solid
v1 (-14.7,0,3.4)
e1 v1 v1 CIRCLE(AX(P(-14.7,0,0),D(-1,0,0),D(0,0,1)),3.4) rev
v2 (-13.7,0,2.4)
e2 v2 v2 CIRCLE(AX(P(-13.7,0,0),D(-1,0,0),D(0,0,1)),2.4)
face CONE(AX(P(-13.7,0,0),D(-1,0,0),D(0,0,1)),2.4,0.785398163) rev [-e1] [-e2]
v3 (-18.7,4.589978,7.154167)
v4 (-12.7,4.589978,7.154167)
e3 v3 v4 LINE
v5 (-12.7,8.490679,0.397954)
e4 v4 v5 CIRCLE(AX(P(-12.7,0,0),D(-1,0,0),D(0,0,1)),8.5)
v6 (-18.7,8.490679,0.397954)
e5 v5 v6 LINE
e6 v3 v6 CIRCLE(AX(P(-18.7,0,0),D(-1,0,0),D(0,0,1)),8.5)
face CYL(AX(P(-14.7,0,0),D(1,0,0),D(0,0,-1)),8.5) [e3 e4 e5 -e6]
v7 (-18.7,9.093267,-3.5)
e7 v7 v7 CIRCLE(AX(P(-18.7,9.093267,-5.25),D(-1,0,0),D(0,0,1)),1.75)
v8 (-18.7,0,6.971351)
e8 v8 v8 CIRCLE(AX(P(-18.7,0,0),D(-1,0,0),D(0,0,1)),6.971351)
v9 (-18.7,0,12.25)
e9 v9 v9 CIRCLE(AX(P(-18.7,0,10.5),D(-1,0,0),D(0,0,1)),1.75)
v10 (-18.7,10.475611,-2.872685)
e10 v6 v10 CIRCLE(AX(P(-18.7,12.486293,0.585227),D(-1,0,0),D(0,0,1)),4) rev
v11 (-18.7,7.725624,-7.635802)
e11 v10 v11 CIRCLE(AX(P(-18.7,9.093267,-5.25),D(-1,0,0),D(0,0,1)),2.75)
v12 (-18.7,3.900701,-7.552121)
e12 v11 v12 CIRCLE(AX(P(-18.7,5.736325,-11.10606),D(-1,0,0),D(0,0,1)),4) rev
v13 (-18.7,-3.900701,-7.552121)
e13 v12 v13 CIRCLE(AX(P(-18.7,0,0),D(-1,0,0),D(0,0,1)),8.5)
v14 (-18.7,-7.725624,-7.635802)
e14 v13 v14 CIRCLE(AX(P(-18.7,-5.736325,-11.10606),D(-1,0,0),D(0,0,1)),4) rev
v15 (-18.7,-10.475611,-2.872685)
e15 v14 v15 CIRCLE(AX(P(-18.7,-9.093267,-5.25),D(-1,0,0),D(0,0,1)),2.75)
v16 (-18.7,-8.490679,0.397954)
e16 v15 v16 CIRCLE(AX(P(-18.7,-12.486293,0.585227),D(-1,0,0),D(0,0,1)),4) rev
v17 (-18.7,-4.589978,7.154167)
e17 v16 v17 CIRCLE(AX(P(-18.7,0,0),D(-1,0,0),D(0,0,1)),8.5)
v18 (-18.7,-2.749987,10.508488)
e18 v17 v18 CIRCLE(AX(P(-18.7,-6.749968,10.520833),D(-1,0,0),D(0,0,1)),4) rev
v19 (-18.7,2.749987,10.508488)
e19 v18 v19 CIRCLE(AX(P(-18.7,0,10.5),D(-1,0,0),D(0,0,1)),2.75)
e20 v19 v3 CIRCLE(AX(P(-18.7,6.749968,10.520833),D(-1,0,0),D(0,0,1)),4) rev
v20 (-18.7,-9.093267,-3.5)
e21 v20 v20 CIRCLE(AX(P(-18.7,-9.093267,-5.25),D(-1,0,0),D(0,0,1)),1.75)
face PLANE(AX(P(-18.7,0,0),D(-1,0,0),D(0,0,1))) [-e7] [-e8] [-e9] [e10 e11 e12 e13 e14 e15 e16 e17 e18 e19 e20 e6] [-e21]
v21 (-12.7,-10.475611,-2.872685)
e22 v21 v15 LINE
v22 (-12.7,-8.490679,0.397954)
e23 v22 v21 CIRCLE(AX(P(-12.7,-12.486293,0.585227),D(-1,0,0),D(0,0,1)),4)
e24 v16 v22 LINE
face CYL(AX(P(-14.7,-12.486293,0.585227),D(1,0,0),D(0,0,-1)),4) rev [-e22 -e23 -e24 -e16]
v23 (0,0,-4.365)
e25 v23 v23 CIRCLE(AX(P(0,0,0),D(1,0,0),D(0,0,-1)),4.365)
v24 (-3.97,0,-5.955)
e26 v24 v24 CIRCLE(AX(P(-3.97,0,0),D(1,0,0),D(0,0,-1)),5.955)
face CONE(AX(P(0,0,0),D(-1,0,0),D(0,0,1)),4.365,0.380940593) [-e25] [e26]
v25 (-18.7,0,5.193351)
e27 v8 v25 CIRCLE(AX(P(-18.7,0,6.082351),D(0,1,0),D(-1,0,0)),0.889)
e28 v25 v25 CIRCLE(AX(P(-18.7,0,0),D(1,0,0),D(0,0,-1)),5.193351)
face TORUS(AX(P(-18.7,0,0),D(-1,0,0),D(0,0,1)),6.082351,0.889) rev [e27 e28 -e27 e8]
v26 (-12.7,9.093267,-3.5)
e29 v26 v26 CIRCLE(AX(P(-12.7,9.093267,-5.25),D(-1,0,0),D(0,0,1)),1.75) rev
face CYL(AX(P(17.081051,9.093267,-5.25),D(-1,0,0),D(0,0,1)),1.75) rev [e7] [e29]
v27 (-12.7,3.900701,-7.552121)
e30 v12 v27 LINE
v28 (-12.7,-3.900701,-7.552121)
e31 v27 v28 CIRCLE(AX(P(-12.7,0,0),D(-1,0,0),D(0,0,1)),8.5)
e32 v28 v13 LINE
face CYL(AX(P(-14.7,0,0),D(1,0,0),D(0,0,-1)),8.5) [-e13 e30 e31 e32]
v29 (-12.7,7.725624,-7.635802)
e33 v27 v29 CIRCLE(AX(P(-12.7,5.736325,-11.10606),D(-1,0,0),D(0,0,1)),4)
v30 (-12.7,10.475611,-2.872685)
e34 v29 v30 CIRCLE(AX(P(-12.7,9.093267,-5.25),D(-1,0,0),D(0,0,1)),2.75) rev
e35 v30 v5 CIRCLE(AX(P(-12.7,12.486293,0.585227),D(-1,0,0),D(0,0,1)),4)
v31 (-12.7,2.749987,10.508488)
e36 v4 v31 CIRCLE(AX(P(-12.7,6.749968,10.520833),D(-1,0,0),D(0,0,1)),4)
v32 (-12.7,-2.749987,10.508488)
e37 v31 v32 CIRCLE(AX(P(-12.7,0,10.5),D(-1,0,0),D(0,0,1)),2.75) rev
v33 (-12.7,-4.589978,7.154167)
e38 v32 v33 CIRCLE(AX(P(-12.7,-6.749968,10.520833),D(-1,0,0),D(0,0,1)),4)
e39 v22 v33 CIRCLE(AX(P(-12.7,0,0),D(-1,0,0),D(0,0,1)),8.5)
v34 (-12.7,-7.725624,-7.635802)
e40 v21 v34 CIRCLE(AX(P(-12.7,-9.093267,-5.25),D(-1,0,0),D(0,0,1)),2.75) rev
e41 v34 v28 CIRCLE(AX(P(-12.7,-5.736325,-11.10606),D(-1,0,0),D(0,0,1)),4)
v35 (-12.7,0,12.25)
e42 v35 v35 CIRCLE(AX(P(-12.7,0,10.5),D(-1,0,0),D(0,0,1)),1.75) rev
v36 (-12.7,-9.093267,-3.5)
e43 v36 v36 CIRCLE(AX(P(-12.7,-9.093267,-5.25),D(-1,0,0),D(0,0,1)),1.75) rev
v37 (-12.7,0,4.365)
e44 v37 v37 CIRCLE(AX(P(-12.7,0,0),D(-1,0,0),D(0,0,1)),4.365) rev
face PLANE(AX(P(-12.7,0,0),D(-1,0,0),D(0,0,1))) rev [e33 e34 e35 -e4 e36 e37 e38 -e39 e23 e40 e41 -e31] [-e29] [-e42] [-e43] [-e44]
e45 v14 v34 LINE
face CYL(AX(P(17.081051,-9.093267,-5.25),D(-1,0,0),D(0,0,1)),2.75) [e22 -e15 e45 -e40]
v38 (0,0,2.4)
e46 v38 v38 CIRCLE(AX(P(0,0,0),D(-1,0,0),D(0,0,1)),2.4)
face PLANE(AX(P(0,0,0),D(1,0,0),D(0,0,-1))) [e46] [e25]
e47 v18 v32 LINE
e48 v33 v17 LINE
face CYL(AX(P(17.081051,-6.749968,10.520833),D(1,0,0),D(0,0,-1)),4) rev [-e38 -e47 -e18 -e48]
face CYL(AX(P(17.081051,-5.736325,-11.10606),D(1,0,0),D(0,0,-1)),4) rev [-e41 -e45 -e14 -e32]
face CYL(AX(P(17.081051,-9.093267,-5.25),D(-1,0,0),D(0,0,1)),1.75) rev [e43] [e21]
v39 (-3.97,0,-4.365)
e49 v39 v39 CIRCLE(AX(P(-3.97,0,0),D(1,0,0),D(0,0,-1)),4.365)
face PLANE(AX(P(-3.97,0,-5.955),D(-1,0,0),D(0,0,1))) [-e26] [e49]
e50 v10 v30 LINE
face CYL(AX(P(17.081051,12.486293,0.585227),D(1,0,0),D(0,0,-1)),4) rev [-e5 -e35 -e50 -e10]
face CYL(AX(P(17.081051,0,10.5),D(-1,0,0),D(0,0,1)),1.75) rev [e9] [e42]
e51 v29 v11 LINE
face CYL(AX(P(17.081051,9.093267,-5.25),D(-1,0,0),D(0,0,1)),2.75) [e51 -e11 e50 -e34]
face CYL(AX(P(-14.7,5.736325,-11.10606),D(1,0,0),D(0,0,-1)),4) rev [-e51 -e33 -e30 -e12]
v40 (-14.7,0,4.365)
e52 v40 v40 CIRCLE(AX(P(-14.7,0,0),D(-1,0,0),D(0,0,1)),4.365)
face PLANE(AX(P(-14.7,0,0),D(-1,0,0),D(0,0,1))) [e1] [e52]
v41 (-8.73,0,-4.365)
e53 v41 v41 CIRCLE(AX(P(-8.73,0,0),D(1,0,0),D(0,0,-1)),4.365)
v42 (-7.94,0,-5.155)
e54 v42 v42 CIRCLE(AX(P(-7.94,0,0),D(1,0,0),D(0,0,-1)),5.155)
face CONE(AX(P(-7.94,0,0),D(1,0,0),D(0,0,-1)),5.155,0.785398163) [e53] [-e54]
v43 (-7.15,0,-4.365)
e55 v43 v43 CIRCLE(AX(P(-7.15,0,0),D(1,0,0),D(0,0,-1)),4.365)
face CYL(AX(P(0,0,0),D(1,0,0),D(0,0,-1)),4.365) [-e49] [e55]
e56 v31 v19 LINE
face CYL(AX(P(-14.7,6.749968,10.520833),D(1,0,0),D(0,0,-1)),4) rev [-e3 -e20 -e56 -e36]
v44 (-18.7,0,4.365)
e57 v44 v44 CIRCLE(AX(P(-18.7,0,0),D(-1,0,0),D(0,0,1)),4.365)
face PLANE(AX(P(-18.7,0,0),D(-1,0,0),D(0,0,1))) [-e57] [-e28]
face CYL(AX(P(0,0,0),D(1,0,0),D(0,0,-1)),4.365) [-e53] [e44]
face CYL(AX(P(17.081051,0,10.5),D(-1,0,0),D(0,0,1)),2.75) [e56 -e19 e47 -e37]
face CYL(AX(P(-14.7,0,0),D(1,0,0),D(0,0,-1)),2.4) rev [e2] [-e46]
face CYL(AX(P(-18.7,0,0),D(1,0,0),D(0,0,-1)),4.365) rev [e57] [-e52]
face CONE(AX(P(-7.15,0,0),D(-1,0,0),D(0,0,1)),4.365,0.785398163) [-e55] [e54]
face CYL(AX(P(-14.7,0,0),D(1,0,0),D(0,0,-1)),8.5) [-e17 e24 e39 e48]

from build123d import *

# Parameters (mm, degrees)
SKETCH4_R            = 8.5
SKETCH4_R_2          = 4.365
SKETCH4_R_3          = 3.8
SKETCH4_R_4          = 2.4
BOSS_EXTRUDE1_DEPTH  = 2
BOSS_EXTRUDE2_START  = 2
SKETCH4_3_R          = 8.5
SKETCH4_3_R_2        = 4.365
BOSS_EXTRUDE2_DEPTH  = 4
SKETCH4_4_R          = 2.4
CUT_EXTRUDE2_DEPTH   = 18.486852204
CUT_SWEEP1_PROFILE_R = 0.889
SKETCH14_R           = 2.75
SKETCH14_R_2         = 1.75
BOSS_EXTRUDE3_DEPTH  = 6
FILLET3_R            = 4
CHAMFER1_SIZE        = 1


with BuildPart() as part:
    # Sketch1 → Revolve1 (revolve)
    with BuildSketch(Plane(origin=(0, 0, 0), x_dir=(1, 0, 0), z_dir=(0, 1, 0))):
        Polygon((0, 0), (-12.7, 0), (-12.7, 4.365), (-8.73, 4.365), (-7.94, 5.155), (-7.15, 4.365), (-3.97, 4.365), (-3.97, 5.955), (0, 4.365), align=None)
    revolve(axis=Axis((0, 0, 0), (-1, 0, 0)))

    # Sketch4 → Boss-Extrude1 (add)
    # profile 1 of 3: a face of its own
    with BuildSketch(Plane.ZY.offset(12.7)):
        Circle(SKETCH4_R)
        with Locations(Location((0, 0, 0), (0, 0, 180))):
            Circle(SKETCH4_R_2, mode=Mode.SUBTRACT)
    # profile 2 of 3: a face of its own
    with BuildSketch(Plane.ZY.offset(12.7)):
        with Locations(Location((0, 0, 0), (0, 0, 180))):
            Circle(SKETCH4_R_2)
        Circle(SKETCH4_R_3, mode=Mode.SUBTRACT)
    # profile 3 of 3: a face of its own
    with BuildSketch(Plane.ZY.offset(12.7)):
        Circle(SKETCH4_R_3)
        Circle(SKETCH4_R_4, mode=Mode.SUBTRACT)
    extrude(amount=BOSS_EXTRUDE1_DEPTH)

    # Sketch4<3> → Boss-Extrude2 (add)
    with BuildSketch(Plane.ZY.offset(12.7).offset(BOSS_EXTRUDE2_START)):
        Circle(SKETCH4_3_R)
        with Locations(Location((0, 0, 0), (0, 0, 180))):
            Circle(SKETCH4_3_R_2, mode=Mode.SUBTRACT)
    extrude(amount=BOSS_EXTRUDE2_DEPTH)

    # Sketch4<4> → Cut-Extrude2 (cut, through all)
    with BuildSketch(Plane.ZY.offset(12.7)):
        Circle(SKETCH4_4_R)
    extrude(amount=-CUT_EXTRUDE2_DEPTH, mode=Mode.SUBTRACT)

    # Cut-Sweep1: sweep along a path in Sketch5
    with BuildLine(Plane.ZY.offset(18.7)) as cut_sweep1_path:
        CenterArc((0, 0), 6.082351302, 0, 360)
    # Cut-Sweep1 profile (on start of the path) → Cut-Sweep1 (sweep, cut)
    with BuildSketch(Plane(origin=(-18.7, 0, 6.082351302), x_dir=(0, 0, 1), z_dir=(0, 1, 0))):
        Circle(CUT_SWEEP1_PROFILE_R)
    sweep(path=cut_sweep1_path.line, mode=Mode.SUBTRACT)

    # Sketch14 → Boss-Extrude3 (add)
    # profile 1 of 3: a face of its own
    with BuildSketch(Plane.ZY.offset(18.7)):
        with Locations((10.5, 0)):
            Circle(SKETCH14_R)
        with Locations((10.5, 0)):
            Circle(SKETCH14_R_2, mode=Mode.SUBTRACT)
    # profile 2 of 3: a face of its own
    with BuildSketch(Plane.ZY.offset(18.7)):
        with Locations((-5.25, -9.09326674)):
            Circle(SKETCH14_R)
        with Locations((-5.25, -9.09326674)):
            Circle(SKETCH14_R_2, mode=Mode.SUBTRACT)
    # profile 3 of 3: a face of its own
    with BuildSketch(Plane.ZY.offset(18.7)):
        with Locations((-5.25, 9.09326674)):
            Circle(SKETCH14_R)
        with Locations((-5.25, 9.09326674)):
            Circle(SKETCH14_R_2, mode=Mode.SUBTRACT)
    extrude(amount=-BOSS_EXTRUDE3_DEPTH)

    # Fillet3
    # the kernel refuses this fillet: 4 mm, written as the material it adds along each edge
    with BuildSketch(Plane(origin=(-18.7, 8.059160345, -2.701839101), x_dir=(0, 0.13787930988752692, 0.9904490375102291), z_dir=(1, 0, 0))) as fillet3_piece_1:
        with BuildLine():
            CenterArc((3.866081399, -3.931630738), FILLET3_R, 100.608613334, 57.139697136)
            ThreePointArc((0.163964046, -2.4169271), (0.362452033, -1.189436498), (0, 0))
            ThreePointArc((0, 0), (1.564842471, -0.145284682), (3.129684942, 0))
        make_face()
    extrude(amount=6)
    with BuildSketch(Plane(origin=(-18.7, 6.369441471, -5.628518041), x_dir=(0, 0.559831667079214, -0.8286063628378122), z_dir=(1, 0, 0)), Plane(origin=(-18.7, -8.059160345, -2.701839101), x_dir=(0, -0.9975099934945784, -0.07052526411468515), z_dir=(1, 0, 0))) as fillet3_piece_2:
        with BuildLine():
            CenterArc((4.184287724, -3.591105941), FILLET3_R, 116.132681907, 57.139697136)
            ThreePointArc((0.211830564, -3.12250791), (0.250866796, -1.551420461), (0, 0))
            ThreePointArc((0, 0), (1.211241183, -0.281114665), (2.422482367, 0))
        make_face()
    extrude(amount=6)
    with BuildSketch(Plane(origin=(-18.7, -6.369441471, -5.628518041), x_dir=(0, -0.5598316670792142, -0.8286063628378122), z_dir=(1, 0, 0)), Plane(origin=(-18.7, -1.689718874, 8.330357143), x_dir=(0, -0.43767832641536075, 0.8991316269524996), z_dir=(1, 0, 0))) as fillet3_piece_3:
        with BuildLine():
            CenterArc((4.184287724, 3.591105941), FILLET3_R, 186.727620957, 57.139697136)
            ThreePointArc((0.211830564, 3.12250791), (0.250866796, 1.551420461), (0, 0))
            ThreePointArc((0, 0), (1.211241183, 0.281114665), (2.422482367, 0))
        make_face()
    extrude(amount=6)
    with BuildSketch(Plane(origin=(-18.7, 1.689718874, 8.330357143), x_dir=(0, 0.9266936825814681, -0.3758175337362501), z_dir=(1, 0, 0))) as fillet3_piece_4:
        with BuildLine():
            CenterArc((3.866081399, 3.931630738), FILLET3_R, 202.25168953, 57.139697136)
            ThreePointArc((0.163964046, 2.4169271), (0.362452033, 1.189436498), (0, 0))
            ThreePointArc((0, 0), (1.564842471, 0.145284682), (3.129684942, 0))
        make_face()
    extrude(amount=6)

    # Chamfer1
    chamfer1_edges = [part.edges().sort_by_distance(p)[0] for p in [
        (-14.7, 0, -2.4),
    ]]
    chamfer(chamfer1_edges, length=CHAMFER1_SIZE)


solid = part.part
